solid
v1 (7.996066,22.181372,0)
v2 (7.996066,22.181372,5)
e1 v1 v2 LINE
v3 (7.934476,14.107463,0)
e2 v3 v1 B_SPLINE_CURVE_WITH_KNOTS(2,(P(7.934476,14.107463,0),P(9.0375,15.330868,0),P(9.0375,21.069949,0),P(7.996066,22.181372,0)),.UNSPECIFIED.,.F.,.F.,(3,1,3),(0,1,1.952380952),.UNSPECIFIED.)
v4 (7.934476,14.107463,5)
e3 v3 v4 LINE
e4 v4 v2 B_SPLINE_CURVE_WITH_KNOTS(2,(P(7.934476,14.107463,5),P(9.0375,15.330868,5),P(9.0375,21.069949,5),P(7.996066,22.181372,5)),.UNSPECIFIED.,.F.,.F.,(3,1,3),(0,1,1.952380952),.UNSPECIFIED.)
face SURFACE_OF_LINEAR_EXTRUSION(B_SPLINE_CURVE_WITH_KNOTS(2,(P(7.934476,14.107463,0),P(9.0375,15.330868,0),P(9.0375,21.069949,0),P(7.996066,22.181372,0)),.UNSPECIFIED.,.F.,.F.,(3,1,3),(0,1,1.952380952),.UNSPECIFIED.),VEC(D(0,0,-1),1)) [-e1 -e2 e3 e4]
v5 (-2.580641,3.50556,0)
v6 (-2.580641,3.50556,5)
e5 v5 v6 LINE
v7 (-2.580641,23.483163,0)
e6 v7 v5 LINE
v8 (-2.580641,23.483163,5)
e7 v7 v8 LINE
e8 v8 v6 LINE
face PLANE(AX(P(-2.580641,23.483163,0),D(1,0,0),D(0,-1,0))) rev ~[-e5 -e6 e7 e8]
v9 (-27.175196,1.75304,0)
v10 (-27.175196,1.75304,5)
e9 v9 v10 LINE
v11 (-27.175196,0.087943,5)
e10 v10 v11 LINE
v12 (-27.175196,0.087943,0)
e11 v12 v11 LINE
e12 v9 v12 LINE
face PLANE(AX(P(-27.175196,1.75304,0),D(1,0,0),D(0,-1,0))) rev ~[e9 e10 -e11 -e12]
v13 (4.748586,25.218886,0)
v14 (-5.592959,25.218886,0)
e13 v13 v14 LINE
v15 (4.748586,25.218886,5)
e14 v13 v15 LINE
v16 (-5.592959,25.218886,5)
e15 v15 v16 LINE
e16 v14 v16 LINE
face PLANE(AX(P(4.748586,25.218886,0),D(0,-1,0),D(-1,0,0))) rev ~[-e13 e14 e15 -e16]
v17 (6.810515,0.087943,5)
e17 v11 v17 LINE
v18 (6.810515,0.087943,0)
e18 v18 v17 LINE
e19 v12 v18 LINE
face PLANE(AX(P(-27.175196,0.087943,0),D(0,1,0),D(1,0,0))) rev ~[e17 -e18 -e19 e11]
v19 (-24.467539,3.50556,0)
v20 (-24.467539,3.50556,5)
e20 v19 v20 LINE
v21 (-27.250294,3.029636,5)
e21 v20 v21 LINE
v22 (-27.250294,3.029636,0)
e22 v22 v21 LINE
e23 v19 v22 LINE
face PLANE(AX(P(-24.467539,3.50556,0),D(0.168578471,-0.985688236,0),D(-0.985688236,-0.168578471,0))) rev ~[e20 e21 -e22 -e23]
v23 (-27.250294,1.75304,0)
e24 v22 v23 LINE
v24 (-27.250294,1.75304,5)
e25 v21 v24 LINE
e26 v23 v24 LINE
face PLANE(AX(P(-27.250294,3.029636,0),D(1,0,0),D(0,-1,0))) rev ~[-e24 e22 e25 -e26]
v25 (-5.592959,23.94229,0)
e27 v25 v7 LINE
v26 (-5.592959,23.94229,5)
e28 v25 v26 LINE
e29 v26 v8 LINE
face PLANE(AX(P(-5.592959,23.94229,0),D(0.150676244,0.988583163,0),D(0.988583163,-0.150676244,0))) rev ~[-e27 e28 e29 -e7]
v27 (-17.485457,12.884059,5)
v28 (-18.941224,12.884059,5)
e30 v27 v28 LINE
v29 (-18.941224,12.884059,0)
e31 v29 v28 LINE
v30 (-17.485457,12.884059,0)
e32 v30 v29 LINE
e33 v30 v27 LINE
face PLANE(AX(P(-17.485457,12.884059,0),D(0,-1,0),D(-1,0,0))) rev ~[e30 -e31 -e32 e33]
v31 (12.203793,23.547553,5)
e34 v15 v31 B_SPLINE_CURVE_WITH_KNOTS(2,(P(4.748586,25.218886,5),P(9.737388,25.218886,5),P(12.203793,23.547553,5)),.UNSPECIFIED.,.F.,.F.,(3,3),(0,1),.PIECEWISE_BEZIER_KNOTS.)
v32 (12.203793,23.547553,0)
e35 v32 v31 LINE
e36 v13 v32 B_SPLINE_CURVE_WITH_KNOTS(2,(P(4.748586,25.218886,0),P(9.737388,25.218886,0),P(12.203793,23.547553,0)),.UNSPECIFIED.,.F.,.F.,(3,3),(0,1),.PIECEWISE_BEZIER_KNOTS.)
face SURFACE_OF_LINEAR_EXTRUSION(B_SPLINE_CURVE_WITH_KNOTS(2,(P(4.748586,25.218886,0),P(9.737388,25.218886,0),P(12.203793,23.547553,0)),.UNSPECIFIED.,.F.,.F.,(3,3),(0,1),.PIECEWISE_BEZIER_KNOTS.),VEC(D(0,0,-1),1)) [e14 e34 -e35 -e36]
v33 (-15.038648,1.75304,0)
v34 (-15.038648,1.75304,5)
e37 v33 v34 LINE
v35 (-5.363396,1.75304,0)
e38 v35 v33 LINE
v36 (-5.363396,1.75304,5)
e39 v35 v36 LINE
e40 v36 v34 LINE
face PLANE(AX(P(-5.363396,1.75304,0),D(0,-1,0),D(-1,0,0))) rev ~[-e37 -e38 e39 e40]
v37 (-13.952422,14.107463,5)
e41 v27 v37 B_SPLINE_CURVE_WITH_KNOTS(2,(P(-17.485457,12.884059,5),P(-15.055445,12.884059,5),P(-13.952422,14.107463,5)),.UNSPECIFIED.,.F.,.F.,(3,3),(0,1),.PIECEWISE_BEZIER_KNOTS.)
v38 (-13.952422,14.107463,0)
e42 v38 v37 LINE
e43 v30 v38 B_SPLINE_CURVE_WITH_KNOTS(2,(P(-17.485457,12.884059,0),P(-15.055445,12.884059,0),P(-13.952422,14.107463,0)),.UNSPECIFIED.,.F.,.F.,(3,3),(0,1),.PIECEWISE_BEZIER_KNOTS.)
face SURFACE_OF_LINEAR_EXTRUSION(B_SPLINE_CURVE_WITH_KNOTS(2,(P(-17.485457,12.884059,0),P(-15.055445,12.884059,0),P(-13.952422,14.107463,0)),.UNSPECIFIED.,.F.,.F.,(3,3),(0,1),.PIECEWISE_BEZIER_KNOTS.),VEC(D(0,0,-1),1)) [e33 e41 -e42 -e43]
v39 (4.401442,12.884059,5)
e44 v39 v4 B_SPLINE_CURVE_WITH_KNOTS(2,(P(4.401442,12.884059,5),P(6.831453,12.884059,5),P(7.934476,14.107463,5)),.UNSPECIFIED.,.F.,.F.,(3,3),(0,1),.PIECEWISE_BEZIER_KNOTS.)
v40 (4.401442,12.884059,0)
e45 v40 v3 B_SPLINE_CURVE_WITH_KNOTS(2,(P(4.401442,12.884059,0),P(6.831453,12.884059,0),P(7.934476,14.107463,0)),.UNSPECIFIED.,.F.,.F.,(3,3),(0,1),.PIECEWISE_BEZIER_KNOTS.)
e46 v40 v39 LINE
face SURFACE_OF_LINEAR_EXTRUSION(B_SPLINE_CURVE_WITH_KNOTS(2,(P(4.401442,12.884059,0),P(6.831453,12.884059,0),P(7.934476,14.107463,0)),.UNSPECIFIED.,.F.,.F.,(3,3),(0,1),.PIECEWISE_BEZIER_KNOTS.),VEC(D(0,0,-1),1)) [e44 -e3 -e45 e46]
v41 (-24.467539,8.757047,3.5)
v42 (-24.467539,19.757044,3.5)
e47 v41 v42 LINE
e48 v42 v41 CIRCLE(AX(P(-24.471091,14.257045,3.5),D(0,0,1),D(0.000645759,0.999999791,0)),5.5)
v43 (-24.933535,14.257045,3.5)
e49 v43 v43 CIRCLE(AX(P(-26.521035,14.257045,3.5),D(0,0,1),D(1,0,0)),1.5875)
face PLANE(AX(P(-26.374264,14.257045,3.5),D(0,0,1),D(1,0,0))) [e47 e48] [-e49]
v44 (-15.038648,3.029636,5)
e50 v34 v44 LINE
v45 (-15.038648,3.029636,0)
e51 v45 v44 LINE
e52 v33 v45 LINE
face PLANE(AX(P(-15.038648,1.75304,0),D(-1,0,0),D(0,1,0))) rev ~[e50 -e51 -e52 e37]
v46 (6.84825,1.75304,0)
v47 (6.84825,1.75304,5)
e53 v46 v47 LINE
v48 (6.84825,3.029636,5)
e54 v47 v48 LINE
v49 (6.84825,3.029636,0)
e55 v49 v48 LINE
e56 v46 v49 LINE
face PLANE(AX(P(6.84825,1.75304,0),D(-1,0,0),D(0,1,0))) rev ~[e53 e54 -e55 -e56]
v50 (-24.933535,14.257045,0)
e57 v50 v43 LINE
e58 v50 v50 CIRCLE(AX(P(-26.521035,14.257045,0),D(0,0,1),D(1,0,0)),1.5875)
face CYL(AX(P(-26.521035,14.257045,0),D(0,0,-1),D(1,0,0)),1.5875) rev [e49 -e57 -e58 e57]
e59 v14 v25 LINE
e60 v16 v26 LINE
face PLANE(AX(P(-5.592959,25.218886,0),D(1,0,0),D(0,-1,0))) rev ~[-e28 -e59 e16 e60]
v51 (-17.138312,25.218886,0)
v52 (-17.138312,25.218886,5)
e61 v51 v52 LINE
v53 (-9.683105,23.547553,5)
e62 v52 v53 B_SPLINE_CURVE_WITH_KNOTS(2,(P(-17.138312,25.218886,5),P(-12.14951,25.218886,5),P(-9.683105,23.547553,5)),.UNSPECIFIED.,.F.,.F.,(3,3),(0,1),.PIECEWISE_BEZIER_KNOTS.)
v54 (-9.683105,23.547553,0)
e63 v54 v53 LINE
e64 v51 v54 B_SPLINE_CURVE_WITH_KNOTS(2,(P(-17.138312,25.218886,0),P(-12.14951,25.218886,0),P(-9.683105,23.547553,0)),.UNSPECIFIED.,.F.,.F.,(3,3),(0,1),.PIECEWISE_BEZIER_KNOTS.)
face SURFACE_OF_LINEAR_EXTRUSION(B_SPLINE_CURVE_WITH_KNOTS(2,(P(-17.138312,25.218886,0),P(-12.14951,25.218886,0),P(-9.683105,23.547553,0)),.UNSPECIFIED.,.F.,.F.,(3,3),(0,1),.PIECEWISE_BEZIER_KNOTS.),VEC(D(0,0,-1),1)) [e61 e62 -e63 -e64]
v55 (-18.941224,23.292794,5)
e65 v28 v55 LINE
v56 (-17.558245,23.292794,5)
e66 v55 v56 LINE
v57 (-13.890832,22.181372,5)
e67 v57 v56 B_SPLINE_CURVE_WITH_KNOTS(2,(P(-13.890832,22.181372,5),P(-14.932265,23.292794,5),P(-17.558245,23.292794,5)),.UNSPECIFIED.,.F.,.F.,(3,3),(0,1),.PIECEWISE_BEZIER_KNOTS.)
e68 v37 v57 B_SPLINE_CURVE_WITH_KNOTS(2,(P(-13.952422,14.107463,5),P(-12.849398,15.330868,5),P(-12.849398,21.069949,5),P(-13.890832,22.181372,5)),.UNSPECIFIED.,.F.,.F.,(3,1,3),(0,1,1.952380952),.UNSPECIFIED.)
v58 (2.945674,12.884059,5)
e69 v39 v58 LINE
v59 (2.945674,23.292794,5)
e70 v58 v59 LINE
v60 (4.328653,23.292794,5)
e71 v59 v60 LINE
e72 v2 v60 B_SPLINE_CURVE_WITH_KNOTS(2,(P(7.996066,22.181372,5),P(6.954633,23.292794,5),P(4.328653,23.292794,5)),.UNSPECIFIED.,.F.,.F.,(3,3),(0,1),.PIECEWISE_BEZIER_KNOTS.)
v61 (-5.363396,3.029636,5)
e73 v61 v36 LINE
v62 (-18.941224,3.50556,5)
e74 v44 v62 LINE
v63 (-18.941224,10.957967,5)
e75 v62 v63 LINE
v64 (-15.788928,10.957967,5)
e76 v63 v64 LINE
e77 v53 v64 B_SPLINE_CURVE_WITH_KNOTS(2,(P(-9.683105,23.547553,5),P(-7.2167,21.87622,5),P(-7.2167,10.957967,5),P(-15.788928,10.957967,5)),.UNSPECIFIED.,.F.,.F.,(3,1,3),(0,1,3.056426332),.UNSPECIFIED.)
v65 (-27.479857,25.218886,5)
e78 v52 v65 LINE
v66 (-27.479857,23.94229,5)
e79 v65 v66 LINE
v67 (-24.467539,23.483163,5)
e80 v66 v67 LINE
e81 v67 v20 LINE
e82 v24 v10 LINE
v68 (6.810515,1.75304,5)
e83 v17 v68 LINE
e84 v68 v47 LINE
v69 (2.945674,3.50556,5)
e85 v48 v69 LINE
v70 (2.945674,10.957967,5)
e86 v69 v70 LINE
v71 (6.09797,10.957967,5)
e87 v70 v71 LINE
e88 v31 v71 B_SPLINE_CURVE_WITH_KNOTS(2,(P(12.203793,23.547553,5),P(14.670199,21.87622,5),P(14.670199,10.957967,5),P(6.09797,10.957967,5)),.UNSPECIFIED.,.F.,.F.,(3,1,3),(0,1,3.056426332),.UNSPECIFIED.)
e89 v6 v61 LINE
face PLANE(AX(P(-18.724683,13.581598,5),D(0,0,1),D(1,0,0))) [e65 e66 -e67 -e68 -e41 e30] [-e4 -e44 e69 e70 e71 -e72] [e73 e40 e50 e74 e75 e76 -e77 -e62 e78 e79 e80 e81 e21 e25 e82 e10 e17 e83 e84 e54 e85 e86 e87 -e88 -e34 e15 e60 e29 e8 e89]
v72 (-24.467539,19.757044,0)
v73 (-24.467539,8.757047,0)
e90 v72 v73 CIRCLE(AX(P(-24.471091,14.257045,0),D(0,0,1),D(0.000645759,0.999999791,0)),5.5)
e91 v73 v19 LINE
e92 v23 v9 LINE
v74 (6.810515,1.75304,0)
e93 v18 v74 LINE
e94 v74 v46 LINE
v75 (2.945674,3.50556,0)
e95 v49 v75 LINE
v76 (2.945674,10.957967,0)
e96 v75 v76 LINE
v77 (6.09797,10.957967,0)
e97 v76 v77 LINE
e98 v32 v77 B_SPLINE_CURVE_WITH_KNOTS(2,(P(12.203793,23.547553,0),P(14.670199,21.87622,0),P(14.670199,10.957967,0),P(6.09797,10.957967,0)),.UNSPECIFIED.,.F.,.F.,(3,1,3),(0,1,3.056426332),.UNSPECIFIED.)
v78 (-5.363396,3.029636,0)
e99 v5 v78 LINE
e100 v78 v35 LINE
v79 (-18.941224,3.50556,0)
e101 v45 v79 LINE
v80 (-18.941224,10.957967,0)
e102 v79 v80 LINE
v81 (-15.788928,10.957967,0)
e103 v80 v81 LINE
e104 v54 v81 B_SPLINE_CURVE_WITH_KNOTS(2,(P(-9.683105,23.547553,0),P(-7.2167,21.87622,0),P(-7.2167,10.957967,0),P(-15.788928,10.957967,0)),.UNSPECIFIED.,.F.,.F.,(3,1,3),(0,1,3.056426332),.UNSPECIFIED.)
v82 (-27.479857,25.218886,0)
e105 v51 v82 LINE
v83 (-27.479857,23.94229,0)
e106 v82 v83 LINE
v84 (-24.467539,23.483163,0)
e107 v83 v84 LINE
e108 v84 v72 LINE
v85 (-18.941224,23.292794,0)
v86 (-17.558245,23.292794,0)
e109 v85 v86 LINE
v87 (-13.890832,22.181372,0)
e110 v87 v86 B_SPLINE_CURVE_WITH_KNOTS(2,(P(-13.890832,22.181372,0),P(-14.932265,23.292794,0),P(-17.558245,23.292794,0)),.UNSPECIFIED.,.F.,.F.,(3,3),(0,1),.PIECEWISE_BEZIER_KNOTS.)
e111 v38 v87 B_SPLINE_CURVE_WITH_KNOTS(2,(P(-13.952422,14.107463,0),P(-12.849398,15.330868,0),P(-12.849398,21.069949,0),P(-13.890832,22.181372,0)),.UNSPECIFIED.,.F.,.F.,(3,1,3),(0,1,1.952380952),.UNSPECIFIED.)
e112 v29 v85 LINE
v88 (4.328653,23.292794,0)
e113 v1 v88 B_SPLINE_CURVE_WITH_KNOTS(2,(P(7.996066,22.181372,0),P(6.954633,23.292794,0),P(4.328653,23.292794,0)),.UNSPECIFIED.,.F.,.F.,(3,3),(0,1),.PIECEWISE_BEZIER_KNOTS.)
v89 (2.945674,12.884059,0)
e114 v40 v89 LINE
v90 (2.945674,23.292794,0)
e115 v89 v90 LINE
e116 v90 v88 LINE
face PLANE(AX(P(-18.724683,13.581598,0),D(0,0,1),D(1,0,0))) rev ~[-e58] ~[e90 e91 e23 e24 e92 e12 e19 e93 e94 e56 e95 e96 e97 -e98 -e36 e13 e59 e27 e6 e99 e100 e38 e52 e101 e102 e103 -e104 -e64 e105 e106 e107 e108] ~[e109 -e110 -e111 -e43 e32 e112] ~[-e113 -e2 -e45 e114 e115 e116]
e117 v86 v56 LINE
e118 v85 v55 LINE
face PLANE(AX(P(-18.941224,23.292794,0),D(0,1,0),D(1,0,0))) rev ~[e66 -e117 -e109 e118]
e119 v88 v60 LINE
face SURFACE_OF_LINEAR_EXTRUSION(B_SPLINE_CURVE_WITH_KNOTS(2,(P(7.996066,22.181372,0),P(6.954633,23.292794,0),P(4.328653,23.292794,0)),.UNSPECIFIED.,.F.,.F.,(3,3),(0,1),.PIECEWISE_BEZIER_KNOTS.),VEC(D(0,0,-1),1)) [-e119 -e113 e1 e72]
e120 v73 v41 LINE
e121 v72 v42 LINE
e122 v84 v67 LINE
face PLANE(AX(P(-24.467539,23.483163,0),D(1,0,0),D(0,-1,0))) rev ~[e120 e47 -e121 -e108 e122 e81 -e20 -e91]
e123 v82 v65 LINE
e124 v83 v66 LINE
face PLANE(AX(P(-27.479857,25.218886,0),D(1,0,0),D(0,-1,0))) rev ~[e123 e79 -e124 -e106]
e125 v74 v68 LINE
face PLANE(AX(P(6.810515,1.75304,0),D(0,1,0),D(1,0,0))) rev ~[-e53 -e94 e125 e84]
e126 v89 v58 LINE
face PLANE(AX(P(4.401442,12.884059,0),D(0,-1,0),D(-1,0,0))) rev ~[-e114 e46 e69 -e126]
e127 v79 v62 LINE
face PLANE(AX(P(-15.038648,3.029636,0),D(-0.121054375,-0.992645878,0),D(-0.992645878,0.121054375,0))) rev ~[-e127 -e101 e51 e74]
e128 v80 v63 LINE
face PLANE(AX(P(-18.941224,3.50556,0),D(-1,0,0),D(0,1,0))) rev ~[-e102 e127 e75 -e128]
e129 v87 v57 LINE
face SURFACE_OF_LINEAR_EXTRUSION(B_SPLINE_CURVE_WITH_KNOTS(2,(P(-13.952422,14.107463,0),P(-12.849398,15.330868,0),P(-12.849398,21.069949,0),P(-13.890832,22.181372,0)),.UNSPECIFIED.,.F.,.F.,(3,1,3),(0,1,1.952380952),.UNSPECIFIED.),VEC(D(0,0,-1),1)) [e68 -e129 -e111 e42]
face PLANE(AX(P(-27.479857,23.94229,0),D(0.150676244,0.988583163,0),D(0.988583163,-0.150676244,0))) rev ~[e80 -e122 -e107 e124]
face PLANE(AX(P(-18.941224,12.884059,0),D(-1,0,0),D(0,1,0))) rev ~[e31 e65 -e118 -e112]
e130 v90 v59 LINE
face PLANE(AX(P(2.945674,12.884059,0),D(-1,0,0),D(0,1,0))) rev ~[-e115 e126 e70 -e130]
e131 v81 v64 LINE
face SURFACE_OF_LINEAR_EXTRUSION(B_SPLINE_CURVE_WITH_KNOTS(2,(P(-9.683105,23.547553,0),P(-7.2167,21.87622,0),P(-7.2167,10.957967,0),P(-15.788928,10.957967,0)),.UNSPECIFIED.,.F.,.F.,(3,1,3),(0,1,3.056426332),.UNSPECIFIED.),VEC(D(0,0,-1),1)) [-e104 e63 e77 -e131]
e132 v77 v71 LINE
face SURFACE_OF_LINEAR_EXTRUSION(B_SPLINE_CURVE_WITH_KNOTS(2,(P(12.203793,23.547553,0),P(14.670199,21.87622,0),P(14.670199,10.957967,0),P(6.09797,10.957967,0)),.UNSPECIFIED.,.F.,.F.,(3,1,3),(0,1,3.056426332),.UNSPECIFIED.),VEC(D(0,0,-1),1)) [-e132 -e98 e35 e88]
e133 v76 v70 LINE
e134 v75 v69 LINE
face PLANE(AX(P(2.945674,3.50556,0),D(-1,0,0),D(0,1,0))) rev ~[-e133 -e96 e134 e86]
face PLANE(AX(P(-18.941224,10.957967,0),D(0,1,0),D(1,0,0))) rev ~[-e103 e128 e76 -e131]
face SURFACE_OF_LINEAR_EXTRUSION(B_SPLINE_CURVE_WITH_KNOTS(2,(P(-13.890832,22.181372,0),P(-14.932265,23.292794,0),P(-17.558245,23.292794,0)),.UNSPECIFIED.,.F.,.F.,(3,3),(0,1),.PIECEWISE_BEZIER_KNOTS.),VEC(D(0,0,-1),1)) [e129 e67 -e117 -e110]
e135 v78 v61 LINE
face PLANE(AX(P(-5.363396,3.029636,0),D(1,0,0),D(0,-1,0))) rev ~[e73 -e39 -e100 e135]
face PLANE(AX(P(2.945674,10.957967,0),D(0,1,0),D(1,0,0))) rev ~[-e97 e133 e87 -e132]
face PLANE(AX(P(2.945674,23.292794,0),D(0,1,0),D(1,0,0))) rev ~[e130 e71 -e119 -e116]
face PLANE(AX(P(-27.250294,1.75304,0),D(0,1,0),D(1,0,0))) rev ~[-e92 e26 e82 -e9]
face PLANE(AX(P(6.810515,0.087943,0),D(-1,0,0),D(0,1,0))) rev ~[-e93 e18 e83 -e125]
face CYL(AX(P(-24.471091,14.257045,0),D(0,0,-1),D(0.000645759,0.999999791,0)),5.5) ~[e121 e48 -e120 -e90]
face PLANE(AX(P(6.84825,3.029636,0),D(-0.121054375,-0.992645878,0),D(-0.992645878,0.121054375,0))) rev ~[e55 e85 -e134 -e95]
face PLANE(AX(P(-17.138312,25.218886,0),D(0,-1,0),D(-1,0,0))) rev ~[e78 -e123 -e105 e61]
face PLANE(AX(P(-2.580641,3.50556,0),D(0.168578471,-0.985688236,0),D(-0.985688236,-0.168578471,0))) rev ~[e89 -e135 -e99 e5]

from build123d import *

# Parameters (mm, degrees)
F1_DEPTH = 5
F0_R     = 1.5875
F2_DEPTH = 3.5


# Not quite as in the source:
# - a feature names something its author has since deleted; it is built from what else it names


with BuildPart() as f1:
    # F0 (on Top) → F1 (new body)
    with BuildSketch(Plane.XY):
        with BuildLine():
            Line((-27.2502941939, 1.753040044), (-27.1751960216, 1.753040044))
            Line((-27.1751960216, 1.753040044), (-15.0386480573, 1.753040044))
            Line((-15.0386480573, 1.753040044), (-15.0386480573, 3.0296357887))
            Line((-15.0386480573, 3.0296357887), (-18.9412236452, 3.5055596409))
            Line((-18.9412236452, 3.5055596409), (-18.9412236452, 10.9579672556))
            Line((-18.9412236452, 10.9579672556), (-15.7889280125, 10.9579672556))
            add(Edge.make_bspline(
                [(-7.216699569, 18.3039918917), (-7.216699569, 10.9579672556), (-15.7889280125, 10.9579672556)],
                knots=[0, 0, 0, 1, 1, 1], degree=2))
            add(Edge.make_bspline(
                [(-9.6831049442, 23.5475529219), (-7.216699569, 21.8762203352), (-7.216699569, 18.3039918917)],
                knots=[0, 0, 0, 1, 1, 1], degree=2))
            add(Edge.make_bspline(
                [(-17.138312111, 25.2188855087), (-12.1495103193, 25.2188855087), (-9.6831049442, 23.5475529219)],
                knots=[0, 0, 0, 1, 1, 1], degree=2))
            Line((-17.138312111, 25.2188855087), (-27.4798574638, 25.2188855087))
            Line((-27.4798574638, 25.2188855087), (-27.4798574638, 23.942289764))
            Line((-27.4798574638, 23.942289764), (-24.4675394346, 23.4831632243))
            Line((-24.4675394346, 23.4831632243), (-24.4675394346, 19.757044316))
            ThreePointArc((-24.4675394346, 19.757044316), (-20.580748307, 18.1448768508), (-18.9710911065, 14.2570454627))
            ThreePointArc((-18.9710911065, 14.2570454627), (-20.580748307, 10.3692140746), (-24.4675394346, 8.7570466095))
            Line((-24.4675394346, 8.7570466095), (-24.4675394346, 3.5055596409))
            Line((-24.4675394346, 3.5055596409), (-27.2502941939, 3.0296357887))
            Line((-27.2502941939, 3.0296357887), (-27.2502941939, 1.753040044))
        make_face()
        with BuildLine():
            add(Edge.make_bspline(
                [(-12.8493983372, 18.2703972668), (-12.8493983372, 21.0699493385), (-13.8908317079, 22.181371511)],
                knots=[0, 0, 0, 1, 1, 1], degree=2))
            add(Edge.make_bspline(
                [(-13.9524218535, 14.1074633363), (-12.8493983372, 15.3308675916), (-12.8493983372, 18.2703972668)],
                knots=[0, 0, 0, 1, 1, 1], degree=2))
            add(Edge.make_bspline(
                [(-17.4854565679, 12.884059081), (-15.0554453697, 12.884059081), (-13.9524218535, 14.1074633363)],
                knots=[0, 0, 0, 1, 1, 1], degree=2))
            Line((-17.4854565679, 12.884059081), (-18.9412236452, 12.884059081))
            Line((-18.9412236452, 12.884059081), (-18.9412236452, 23.2927936834))
            Line((-18.9412236452, 23.2927936834), (-17.5582449218, 23.2927936834))
            add(Edge.make_bspline(
                [(-13.8908317079, 22.181371511), (-14.9322650785, 23.2927936834), (-17.5582449218, 23.2927936834)],
                knots=[0, 0, 0, 1, 1, 1], degree=2))
        make_face(mode=Mode.SUBTRACT)
        Polygon((-15.0386480573, 1.753040044), (-27.1751960216, 1.753040044), (-27.1751960216, 0.0879431242), (6.8105147628, 0.0879431242), (6.8105147628, 1.753040044), (-5.3633960976, 1.753040044), align=None)
        with BuildLine():
            Line((-5.3633960976, 3.0296357887), (-5.3633960976, 1.753040044))
            Line((-5.3633960976, 1.753040044), (6.8105147628, 1.753040044))
            Line((6.8105147628, 1.753040044), (6.848250039, 1.753040044))
            Line((6.848250039, 1.753040044), (6.848250039, 3.0296357887))
            Line((6.848250039, 3.0296357887), (2.9456744511, 3.5055596409))
            Line((2.9456744511, 3.5055596409), (2.9456744511, 10.9579672556))
            Line((2.9456744511, 10.9579672556), (6.0979700838, 10.9579672556))
            add(Edge.make_bspline(
                [(14.6701985273, 18.3039918917), (14.6701985273, 10.9579672556), (6.0979700838, 10.9579672556)],
                knots=[0, 0, 0, 1, 1, 1], degree=2))
            add(Edge.make_bspline(
                [(12.2037931521, 23.5475529219), (14.6701985273, 21.8762203352), (14.6701985273, 18.3039918917)],
                knots=[0, 0, 0, 1, 1, 1], degree=2))
            add(Edge.make_bspline(
                [(4.7485859853, 25.2188855087), (9.737387777, 25.2188855087), (12.2037931521, 23.5475529219)],
                knots=[0, 0, 0, 1, 1, 1], degree=2))
            Line((4.7485859853, 25.2188855087), (-5.5929593675, 25.2188855087))
            Line((-5.5929593675, 25.2188855087), (-5.5929593675, 23.942289764))
            Line((-5.5929593675, 23.942289764), (-2.5806413383, 23.4831632243))
            Line((-2.5806413383, 23.4831632243), (-2.5806413383, 3.5055596409))
            Line((-2.5806413383, 3.5055596409), (-5.3633960976, 3.0296357887))
        make_face()
        with BuildLine():
            add(Edge.make_bspline(
                [(9.0374997591, 18.2703972668), (9.0374997591, 21.0699493385), (7.9960663884, 22.181371511)],
                knots=[0, 0, 0, 1, 1, 1], degree=2))
            add(Edge.make_bspline(
                [(7.9344762428, 14.1074633363), (9.0374997591, 15.3308675916), (9.0374997591, 18.2703972668)],
                knots=[0, 0, 0, 1, 1, 1], degree=2))
            add(Edge.make_bspline(
                [(4.4014415284, 12.884059081), (6.8314527266, 12.884059081), (7.9344762428, 14.1074633363)],
                knots=[0, 0, 0, 1, 1, 1], degree=2))
            Line((4.4014415284, 12.884059081), (2.9456744511, 12.884059081))
            Line((2.9456744511, 12.884059081), (2.9456744511, 23.2927936834))
            Line((2.9456744511, 23.2927936834), (4.3286531745, 23.2927936834))
            add(Edge.make_bspline(
                [(7.9960663884, 22.181371511), (6.9546330178, 23.2927936834), (4.3286531745, 23.2927936834)],
                knots=[0, 0, 0, 1, 1, 1], degree=2))
        make_face(mode=Mode.SUBTRACT)
        with BuildLine():
            Line((-24.4675394346, 19.757044316), (-24.4675394346, 8.7570466095))
            ThreePointArc((-24.4675394346, 8.7570466095), (-20.580748307, 10.3692140746), (-18.9710911065, 14.2570454627))
            ThreePointArc((-18.9710911065, 14.2570454627), (-20.580748307, 18.1448768508), (-24.4675394346, 19.757044316))
        make_face()
    extrude(amount=F1_DEPTH)

    # F0 (on Top) → F2 (join)
    with BuildSketch(Plane.XY):
        with BuildLine():
            ThreePointArc((-24.4675394346, 19.757044316), (-29.9710911065, 14.2570454627), (-24.4675394346, 8.7570466095))
            Line((-24.4675394346, 8.7570466095), (-24.4675394346, 19.757044316))
        make_face()
        with Locations((-26.5210345387, 14.2570454627)):
            Circle(F0_R, mode=Mode.SUBTRACT)
    extrude(amount=F2_DEPTH)


solid = f1.part
